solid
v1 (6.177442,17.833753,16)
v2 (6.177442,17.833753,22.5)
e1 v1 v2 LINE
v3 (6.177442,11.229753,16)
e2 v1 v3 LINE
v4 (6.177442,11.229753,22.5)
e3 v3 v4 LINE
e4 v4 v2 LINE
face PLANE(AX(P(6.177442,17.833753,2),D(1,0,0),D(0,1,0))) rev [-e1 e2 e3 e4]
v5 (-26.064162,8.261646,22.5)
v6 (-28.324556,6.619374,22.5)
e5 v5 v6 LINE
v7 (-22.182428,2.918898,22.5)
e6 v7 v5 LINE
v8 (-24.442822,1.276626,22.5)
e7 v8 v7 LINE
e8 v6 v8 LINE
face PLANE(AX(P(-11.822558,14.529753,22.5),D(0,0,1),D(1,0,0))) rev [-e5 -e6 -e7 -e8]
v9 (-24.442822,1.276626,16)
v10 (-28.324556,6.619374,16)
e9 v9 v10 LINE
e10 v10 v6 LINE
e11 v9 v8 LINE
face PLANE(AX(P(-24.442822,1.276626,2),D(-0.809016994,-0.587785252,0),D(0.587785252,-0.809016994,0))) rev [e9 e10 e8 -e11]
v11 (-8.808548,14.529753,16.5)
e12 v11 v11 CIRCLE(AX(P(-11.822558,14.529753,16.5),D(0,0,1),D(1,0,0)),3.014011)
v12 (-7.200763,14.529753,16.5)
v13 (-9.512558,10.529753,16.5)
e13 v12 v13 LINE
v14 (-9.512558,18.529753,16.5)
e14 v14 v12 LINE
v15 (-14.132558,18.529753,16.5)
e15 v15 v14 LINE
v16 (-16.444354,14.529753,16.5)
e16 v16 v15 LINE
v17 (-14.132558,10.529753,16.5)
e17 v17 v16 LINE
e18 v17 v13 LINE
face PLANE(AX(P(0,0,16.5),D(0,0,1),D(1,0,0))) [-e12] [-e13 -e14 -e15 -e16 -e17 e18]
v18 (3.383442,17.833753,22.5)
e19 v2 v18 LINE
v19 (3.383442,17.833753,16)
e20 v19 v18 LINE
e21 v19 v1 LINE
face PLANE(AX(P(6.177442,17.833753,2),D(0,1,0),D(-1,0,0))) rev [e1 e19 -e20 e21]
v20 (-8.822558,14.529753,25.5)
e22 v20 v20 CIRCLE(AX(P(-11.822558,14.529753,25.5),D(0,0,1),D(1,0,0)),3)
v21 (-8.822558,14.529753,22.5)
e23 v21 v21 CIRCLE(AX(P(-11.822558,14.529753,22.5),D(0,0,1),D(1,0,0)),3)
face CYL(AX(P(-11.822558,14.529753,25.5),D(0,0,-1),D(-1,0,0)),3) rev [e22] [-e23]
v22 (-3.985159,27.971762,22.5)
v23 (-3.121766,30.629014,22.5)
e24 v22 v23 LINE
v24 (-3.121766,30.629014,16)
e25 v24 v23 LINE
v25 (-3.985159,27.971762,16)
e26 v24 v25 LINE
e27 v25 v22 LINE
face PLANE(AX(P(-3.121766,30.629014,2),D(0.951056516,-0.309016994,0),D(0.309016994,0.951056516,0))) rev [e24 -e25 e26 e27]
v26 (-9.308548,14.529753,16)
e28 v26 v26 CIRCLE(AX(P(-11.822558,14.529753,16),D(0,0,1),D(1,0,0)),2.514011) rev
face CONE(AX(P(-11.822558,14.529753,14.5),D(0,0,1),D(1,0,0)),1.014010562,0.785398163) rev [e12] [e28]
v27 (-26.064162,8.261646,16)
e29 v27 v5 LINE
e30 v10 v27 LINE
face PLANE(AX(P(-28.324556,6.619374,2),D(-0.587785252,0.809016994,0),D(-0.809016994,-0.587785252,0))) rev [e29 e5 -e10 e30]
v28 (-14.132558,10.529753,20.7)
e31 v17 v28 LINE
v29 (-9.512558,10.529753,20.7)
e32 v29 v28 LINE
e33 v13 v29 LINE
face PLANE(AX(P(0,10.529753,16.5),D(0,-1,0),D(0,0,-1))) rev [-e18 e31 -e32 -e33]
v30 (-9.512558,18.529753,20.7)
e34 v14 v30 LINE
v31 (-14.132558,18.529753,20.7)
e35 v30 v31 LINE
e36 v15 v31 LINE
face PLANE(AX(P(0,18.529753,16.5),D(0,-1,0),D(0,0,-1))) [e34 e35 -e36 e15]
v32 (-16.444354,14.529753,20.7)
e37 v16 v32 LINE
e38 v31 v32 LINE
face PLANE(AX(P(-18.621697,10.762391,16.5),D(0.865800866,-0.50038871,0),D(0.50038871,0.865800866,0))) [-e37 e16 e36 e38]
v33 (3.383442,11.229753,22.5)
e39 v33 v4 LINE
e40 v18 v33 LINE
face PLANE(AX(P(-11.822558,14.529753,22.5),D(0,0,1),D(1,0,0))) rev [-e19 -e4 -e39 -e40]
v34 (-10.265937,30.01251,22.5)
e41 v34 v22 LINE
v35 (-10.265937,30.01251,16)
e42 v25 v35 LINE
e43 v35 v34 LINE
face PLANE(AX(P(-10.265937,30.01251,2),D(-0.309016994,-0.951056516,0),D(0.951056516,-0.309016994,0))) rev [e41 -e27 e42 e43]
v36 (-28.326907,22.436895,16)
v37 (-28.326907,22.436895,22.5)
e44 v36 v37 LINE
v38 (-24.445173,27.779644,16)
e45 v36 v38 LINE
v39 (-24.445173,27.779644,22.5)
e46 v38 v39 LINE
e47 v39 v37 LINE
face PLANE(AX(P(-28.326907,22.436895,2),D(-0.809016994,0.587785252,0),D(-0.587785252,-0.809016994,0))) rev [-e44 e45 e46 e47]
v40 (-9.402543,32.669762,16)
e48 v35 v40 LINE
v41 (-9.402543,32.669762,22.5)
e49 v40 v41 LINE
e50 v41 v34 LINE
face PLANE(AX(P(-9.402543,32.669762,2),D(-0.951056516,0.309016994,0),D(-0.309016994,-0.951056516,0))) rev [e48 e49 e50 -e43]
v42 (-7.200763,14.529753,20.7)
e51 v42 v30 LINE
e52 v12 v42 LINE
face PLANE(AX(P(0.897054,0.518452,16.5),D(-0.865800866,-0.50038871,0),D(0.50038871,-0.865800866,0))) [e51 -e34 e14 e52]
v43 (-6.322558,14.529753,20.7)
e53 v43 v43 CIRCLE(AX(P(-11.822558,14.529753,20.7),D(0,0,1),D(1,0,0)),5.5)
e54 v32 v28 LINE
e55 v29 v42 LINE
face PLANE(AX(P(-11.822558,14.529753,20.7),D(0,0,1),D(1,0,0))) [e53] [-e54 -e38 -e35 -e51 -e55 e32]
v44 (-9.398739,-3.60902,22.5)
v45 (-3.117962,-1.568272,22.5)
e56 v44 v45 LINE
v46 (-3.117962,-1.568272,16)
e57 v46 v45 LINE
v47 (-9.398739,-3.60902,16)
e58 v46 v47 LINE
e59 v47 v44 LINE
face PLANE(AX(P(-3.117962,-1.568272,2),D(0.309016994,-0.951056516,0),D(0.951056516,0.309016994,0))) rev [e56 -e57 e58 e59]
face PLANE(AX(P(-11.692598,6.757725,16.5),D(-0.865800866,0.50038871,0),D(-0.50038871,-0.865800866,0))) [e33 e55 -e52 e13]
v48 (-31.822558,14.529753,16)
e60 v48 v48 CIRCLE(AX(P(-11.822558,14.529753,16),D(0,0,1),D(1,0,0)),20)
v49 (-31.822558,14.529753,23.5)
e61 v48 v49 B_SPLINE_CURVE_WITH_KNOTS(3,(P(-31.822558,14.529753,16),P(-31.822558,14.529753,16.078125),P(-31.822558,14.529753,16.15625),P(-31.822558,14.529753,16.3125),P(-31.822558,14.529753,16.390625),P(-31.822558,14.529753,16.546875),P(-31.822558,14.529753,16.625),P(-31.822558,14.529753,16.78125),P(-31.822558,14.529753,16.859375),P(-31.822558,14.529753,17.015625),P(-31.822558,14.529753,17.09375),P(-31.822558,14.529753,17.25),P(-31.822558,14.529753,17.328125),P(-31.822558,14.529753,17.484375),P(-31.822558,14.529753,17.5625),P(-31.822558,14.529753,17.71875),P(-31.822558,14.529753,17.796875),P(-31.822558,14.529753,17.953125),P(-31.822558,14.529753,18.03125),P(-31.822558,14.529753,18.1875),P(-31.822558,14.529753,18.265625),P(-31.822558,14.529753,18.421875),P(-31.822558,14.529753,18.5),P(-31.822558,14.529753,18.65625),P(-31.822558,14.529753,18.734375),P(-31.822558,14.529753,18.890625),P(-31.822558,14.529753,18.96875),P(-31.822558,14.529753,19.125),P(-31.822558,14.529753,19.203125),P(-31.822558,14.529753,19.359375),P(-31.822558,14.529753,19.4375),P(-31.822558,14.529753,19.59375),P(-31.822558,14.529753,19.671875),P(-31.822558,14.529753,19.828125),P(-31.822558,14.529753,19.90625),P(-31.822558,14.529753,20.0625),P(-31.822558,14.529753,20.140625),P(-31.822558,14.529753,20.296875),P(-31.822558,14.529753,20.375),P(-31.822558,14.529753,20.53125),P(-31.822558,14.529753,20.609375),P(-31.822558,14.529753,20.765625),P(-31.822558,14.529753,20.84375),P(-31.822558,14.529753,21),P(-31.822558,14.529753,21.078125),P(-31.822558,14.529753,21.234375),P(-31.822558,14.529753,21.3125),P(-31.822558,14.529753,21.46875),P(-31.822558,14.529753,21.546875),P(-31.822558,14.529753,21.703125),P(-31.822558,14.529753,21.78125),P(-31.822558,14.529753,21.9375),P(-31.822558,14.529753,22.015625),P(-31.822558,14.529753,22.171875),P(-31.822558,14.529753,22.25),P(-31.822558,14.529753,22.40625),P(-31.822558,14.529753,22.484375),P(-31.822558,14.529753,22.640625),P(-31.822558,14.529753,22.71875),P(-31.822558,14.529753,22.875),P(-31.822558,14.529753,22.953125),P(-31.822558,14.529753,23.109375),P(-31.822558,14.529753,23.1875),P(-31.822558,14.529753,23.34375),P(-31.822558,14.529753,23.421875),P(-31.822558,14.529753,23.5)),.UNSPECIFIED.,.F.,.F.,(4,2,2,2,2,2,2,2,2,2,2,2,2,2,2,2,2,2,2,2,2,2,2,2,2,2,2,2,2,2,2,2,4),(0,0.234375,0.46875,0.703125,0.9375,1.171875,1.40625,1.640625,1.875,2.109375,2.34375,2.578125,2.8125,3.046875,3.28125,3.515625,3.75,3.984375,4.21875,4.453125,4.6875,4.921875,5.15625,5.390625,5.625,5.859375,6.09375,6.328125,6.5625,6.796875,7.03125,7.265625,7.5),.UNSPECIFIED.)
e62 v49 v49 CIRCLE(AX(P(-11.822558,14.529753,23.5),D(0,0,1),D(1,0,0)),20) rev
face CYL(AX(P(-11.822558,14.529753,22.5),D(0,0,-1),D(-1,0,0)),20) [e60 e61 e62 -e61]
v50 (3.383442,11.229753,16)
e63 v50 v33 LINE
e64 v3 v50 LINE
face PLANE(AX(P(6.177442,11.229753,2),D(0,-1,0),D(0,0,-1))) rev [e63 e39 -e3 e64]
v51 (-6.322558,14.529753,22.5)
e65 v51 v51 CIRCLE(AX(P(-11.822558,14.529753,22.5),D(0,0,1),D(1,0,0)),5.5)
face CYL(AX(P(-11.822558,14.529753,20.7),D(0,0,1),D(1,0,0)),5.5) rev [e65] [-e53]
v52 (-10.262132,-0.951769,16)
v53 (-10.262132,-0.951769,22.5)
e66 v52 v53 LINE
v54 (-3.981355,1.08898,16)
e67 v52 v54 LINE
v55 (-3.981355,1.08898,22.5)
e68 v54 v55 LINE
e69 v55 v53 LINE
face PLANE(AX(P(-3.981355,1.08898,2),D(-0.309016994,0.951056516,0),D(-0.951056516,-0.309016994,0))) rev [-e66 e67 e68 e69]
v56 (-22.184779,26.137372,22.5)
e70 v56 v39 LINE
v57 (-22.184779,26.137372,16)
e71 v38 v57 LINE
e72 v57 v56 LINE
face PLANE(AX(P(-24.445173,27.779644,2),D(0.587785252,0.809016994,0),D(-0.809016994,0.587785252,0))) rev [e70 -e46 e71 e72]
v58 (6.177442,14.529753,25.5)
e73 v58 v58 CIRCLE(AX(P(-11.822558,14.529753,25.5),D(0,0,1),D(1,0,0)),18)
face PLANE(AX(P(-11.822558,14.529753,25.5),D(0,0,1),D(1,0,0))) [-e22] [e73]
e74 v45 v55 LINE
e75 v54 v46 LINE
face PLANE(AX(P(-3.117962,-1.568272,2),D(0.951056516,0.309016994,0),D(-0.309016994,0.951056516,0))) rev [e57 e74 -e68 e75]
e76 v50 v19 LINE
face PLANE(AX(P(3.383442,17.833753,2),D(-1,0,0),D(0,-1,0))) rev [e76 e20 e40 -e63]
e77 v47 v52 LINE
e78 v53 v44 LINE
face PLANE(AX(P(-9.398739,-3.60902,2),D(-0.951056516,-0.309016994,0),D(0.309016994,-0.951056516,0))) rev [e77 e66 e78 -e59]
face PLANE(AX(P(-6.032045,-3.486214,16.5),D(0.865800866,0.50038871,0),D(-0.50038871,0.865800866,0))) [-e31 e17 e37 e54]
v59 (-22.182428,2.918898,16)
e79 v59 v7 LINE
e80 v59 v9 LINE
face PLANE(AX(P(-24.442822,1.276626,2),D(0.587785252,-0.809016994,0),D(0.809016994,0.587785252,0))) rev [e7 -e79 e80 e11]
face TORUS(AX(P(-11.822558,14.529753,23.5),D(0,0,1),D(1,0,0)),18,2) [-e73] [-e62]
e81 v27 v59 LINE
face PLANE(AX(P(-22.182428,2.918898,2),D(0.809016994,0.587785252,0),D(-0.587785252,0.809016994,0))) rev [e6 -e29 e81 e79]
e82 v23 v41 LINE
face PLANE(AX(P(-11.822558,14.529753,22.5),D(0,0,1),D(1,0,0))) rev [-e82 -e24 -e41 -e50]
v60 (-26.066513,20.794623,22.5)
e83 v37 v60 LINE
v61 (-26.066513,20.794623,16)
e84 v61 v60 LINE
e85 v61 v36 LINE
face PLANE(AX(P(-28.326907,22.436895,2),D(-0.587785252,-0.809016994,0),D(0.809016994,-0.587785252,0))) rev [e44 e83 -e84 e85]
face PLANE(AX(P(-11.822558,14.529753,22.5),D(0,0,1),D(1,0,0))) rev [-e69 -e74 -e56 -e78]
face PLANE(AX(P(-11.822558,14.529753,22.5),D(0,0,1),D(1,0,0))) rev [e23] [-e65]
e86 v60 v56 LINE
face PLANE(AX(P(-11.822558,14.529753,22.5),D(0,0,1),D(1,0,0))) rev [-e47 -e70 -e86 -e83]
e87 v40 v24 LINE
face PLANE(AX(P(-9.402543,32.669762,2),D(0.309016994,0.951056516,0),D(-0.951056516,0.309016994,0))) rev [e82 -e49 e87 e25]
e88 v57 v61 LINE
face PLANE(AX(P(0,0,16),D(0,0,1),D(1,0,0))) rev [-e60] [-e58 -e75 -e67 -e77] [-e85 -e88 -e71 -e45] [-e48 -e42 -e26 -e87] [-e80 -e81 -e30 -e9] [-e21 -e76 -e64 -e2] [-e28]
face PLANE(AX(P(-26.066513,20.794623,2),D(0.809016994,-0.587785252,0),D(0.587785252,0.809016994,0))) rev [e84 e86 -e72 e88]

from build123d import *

# Parameters (mm, degrees)
SKETCH1_R                       = 20
SKETCH1_R_2                     = 1
BOSS_EXTRUDE1_DEPTH             = 22.5
TAP_DRILL_FOR_M5X0_8_TAP1_D     = 4.2
TAP_DRILL_FOR_M5X0_8_TAP1_DEPTH = 5
TAP_DRILL_FOR_M5X0_8_TAP1_TIP   = 1.2618073
SKETCH4_W                       = 2.794
SKETCH4_H                       = 6.604
CUT_EXTRUDE1_DEPTH              = 20.5
CIRPATTERN1_COUNT               = 5
CUT_EXTRUDE3_START              = -6
SKETCH6_W                       = 4.62
SKETCH6_H                       = 8
SKETCH6_R                       = 2.1
CUT_EXTRUDE3_DEPTH              = 6
SKETCH7_R                       = 5.5
CUT_EXTRUDE4_DEPTH              = 1.8
SKETCH9_R                       = 3.014010562
CUT_EXTRUDE5_DEPTH              = 2
CHAMFER1_SIZE                   = 2
SKETCH8_R                       = 20
SKETCH8_R_2                     = 3
BOSS_EXTRUDE2_DEPTH             = 3
SKETCH5_R                       = 6
SKETCH5_R_2                     = 5
CUT_EXTRUDE2_DEPTH              = 1
FILLET3_R                       = 0.5
FILLET4_R                       = 2
SKETCH10_W                      = 43.83789535
SKETCH10_H                      = 47.8950696
CUT_EXTRUDE6_DEPTH              = 16


with BuildPart() as part:
    # Sketch1 → Boss-Extrude1 (new body)
    with BuildSketch(Plane.XY):
        with Locations(Location((-11.822558412, 14.529752947, 0), (0, 0, 180))):
            Circle(SKETCH1_R)
        with Locations(Location((-11.822558412, 14.529752947, 0), (0, 0, 180))):
            Circle(SKETCH1_R_2, mode=Mode.SUBTRACT)
    extrude(amount=BOSS_EXTRUDE1_DEPTH)

    # Tap Drill for M5x0.8 Tap1
    with Locations(Plane.XY.offset(22.5)):
        with Locations((-11.822558412, 14.529752947)):
            Hole(TAP_DRILL_FOR_M5X0_8_TAP1_D / 2, depth=TAP_DRILL_FOR_M5X0_8_TAP1_DEPTH)
            with Locations((0, 0, -(TAP_DRILL_FOR_M5X0_8_TAP1_DEPTH + TAP_DRILL_FOR_M5X0_8_TAP1_TIP / 2))):  # 118° drill point
                Cone(0, TAP_DRILL_FOR_M5X0_8_TAP1_D / 2, TAP_DRILL_FOR_M5X0_8_TAP1_TIP, mode=Mode.SUBTRACT)

    # Sketch4 → Cut-Extrude1 (cut)
    with BuildSketch(Plane.XY.offset(22.5)):
        with Locations((4.780441588, 14.531752947)):
            Rectangle(SKETCH4_W, SKETCH4_H)
    cut_extrude1 = extrude(amount=-CUT_EXTRUDE1_DEPTH, mode=Mode.SUBTRACT)

    # CirPattern1: Cut-Extrude1 ×5 about axis
    cirpattern1_axis = Axis((-11.822558412, 14.529752947, 0), (0, 0, 1))
    for i in range(1, CIRPATTERN1_COUNT):
        add(cut_extrude1.rotate(cirpattern1_axis, i * 360 / CIRPATTERN1_COUNT), mode=Mode.SUBTRACT)

    # Sketch6 → Cut-Extrude3 (cut)
    # profile 1 of 4: a face of its own
    with BuildSketch(Plane.XY.offset(22.5).offset(CUT_EXTRUDE3_START)):
        Polygon((-16.444354251, 14.529752947), (-14.132558412, 18.529752947), (-14.132558412, 10.529752947), align=None)
    # profile 2 of 4: a face of its own
    with BuildSketch(Plane.XY.offset(22.5).offset(CUT_EXTRUDE3_START)):
        Polygon((-7.200762573, 14.529752947), (-9.512558412, 10.529752947), (-9.512558412, 18.529752947), align=None)
    # profile 3 of 4: a face of its own
    with BuildSketch(Plane.XY.offset(22.5).offset(CUT_EXTRUDE3_START)):
        with Locations((-11.822558412, 14.529752947)):
            Rectangle(SKETCH6_W, SKETCH6_H)
        with Locations((-11.822558412, 14.529752947)):
            Circle(SKETCH6_R, mode=Mode.SUBTRACT)
    # profile 4 of 4: a face of its own
    with BuildSketch(Plane.XY.offset(22.5).offset(CUT_EXTRUDE3_START)):
        with Locations((-11.822558412, 14.529752947)):
            Circle(SKETCH6_R)
    extrude(amount=CUT_EXTRUDE3_DEPTH, mode=Mode.SUBTRACT)

    # Sketch7 → Cut-Extrude4 (cut)
    with BuildSketch(Plane.XY.offset(22.5)):
        with Locations((-11.822558412, 14.529752947)):
            Circle(SKETCH7_R)
    extrude(amount=-CUT_EXTRUDE4_DEPTH, mode=Mode.SUBTRACT)

    # Sketch9 → Cut-Extrude5 (cut)
    with BuildSketch(Plane.XY.offset(16.5)):
        with Locations((-11.822558412, 14.529752947)):
            Circle(SKETCH9_R)
    extrude(amount=-CUT_EXTRUDE5_DEPTH, mode=Mode.SUBTRACT)

    # Chamfer1
    chamfer1_edges = [part.edges().sort_by_distance(p)[0] for p in [
        (-14.836568974, 14.529752947, 14.5),
    ]]
    chamfer(chamfer1_edges, length=CHAMFER1_SIZE - 0.0001)  # a hair under: the kernel refuses the full size

    # Sketch8 → Boss-Extrude2 (add)
    with BuildSketch(Plane.XY.offset(22.5)):
        with Locations(Location((-11.822558412, 14.529752947, 0), (0, 0, 180))):
            Circle(SKETCH8_R)
        with Locations((-11.822558412, 14.529752947)):
            Circle(SKETCH8_R_2, mode=Mode.SUBTRACT)
    extrude(amount=BOSS_EXTRUDE2_DEPTH)

    # Sketch5 → Cut-Extrude2 (cut)
    with BuildSketch(Plane(origin=(0, 0, 0), x_dir=(-1, 0, 0), z_dir=(0, 0, -1))):
        with Locations((11.822558412, 14.529752947)):
            Circle(SKETCH5_R)
        with Locations((11.822558412, 14.529752947)):
            Circle(SKETCH5_R_2, mode=Mode.SUBTRACT)
    extrude(amount=-CUT_EXTRUDE2_DEPTH, mode=Mode.SUBTRACT)

    # Fillet3
    fillet3_edges = [part.edges().sort_by_distance(p)[0] for p in [
        (-5.822558412, 14.529752947, 1),
        (-6.822558412, 14.529752947, 1),
    ]]
    fillet(fillet3_edges, radius=FILLET3_R - 0.0001)  # a hair under: the kernel refuses the full size

    # Fillet4
    fillet4_edges = [part.edges().sort_by_distance(p)[0] for p in [
        (8.177441588, 14.529752947, 25.5),
    ]]
    fillet(fillet4_edges, radius=FILLET4_R)

    # Sketch10 → Cut-Extrude6 (cut)
    with BuildSketch(Plane(origin=(0, 0, 0), x_dir=(-1, 0, 0), z_dir=(0, 0, -1))):
        with Locations((12.103243423, 14.057691792)):
            Rectangle(SKETCH10_W, SKETCH10_H)
    extrude(amount=-CUT_EXTRUDE6_DEPTH, mode=Mode.SUBTRACT)


solid = part.part
